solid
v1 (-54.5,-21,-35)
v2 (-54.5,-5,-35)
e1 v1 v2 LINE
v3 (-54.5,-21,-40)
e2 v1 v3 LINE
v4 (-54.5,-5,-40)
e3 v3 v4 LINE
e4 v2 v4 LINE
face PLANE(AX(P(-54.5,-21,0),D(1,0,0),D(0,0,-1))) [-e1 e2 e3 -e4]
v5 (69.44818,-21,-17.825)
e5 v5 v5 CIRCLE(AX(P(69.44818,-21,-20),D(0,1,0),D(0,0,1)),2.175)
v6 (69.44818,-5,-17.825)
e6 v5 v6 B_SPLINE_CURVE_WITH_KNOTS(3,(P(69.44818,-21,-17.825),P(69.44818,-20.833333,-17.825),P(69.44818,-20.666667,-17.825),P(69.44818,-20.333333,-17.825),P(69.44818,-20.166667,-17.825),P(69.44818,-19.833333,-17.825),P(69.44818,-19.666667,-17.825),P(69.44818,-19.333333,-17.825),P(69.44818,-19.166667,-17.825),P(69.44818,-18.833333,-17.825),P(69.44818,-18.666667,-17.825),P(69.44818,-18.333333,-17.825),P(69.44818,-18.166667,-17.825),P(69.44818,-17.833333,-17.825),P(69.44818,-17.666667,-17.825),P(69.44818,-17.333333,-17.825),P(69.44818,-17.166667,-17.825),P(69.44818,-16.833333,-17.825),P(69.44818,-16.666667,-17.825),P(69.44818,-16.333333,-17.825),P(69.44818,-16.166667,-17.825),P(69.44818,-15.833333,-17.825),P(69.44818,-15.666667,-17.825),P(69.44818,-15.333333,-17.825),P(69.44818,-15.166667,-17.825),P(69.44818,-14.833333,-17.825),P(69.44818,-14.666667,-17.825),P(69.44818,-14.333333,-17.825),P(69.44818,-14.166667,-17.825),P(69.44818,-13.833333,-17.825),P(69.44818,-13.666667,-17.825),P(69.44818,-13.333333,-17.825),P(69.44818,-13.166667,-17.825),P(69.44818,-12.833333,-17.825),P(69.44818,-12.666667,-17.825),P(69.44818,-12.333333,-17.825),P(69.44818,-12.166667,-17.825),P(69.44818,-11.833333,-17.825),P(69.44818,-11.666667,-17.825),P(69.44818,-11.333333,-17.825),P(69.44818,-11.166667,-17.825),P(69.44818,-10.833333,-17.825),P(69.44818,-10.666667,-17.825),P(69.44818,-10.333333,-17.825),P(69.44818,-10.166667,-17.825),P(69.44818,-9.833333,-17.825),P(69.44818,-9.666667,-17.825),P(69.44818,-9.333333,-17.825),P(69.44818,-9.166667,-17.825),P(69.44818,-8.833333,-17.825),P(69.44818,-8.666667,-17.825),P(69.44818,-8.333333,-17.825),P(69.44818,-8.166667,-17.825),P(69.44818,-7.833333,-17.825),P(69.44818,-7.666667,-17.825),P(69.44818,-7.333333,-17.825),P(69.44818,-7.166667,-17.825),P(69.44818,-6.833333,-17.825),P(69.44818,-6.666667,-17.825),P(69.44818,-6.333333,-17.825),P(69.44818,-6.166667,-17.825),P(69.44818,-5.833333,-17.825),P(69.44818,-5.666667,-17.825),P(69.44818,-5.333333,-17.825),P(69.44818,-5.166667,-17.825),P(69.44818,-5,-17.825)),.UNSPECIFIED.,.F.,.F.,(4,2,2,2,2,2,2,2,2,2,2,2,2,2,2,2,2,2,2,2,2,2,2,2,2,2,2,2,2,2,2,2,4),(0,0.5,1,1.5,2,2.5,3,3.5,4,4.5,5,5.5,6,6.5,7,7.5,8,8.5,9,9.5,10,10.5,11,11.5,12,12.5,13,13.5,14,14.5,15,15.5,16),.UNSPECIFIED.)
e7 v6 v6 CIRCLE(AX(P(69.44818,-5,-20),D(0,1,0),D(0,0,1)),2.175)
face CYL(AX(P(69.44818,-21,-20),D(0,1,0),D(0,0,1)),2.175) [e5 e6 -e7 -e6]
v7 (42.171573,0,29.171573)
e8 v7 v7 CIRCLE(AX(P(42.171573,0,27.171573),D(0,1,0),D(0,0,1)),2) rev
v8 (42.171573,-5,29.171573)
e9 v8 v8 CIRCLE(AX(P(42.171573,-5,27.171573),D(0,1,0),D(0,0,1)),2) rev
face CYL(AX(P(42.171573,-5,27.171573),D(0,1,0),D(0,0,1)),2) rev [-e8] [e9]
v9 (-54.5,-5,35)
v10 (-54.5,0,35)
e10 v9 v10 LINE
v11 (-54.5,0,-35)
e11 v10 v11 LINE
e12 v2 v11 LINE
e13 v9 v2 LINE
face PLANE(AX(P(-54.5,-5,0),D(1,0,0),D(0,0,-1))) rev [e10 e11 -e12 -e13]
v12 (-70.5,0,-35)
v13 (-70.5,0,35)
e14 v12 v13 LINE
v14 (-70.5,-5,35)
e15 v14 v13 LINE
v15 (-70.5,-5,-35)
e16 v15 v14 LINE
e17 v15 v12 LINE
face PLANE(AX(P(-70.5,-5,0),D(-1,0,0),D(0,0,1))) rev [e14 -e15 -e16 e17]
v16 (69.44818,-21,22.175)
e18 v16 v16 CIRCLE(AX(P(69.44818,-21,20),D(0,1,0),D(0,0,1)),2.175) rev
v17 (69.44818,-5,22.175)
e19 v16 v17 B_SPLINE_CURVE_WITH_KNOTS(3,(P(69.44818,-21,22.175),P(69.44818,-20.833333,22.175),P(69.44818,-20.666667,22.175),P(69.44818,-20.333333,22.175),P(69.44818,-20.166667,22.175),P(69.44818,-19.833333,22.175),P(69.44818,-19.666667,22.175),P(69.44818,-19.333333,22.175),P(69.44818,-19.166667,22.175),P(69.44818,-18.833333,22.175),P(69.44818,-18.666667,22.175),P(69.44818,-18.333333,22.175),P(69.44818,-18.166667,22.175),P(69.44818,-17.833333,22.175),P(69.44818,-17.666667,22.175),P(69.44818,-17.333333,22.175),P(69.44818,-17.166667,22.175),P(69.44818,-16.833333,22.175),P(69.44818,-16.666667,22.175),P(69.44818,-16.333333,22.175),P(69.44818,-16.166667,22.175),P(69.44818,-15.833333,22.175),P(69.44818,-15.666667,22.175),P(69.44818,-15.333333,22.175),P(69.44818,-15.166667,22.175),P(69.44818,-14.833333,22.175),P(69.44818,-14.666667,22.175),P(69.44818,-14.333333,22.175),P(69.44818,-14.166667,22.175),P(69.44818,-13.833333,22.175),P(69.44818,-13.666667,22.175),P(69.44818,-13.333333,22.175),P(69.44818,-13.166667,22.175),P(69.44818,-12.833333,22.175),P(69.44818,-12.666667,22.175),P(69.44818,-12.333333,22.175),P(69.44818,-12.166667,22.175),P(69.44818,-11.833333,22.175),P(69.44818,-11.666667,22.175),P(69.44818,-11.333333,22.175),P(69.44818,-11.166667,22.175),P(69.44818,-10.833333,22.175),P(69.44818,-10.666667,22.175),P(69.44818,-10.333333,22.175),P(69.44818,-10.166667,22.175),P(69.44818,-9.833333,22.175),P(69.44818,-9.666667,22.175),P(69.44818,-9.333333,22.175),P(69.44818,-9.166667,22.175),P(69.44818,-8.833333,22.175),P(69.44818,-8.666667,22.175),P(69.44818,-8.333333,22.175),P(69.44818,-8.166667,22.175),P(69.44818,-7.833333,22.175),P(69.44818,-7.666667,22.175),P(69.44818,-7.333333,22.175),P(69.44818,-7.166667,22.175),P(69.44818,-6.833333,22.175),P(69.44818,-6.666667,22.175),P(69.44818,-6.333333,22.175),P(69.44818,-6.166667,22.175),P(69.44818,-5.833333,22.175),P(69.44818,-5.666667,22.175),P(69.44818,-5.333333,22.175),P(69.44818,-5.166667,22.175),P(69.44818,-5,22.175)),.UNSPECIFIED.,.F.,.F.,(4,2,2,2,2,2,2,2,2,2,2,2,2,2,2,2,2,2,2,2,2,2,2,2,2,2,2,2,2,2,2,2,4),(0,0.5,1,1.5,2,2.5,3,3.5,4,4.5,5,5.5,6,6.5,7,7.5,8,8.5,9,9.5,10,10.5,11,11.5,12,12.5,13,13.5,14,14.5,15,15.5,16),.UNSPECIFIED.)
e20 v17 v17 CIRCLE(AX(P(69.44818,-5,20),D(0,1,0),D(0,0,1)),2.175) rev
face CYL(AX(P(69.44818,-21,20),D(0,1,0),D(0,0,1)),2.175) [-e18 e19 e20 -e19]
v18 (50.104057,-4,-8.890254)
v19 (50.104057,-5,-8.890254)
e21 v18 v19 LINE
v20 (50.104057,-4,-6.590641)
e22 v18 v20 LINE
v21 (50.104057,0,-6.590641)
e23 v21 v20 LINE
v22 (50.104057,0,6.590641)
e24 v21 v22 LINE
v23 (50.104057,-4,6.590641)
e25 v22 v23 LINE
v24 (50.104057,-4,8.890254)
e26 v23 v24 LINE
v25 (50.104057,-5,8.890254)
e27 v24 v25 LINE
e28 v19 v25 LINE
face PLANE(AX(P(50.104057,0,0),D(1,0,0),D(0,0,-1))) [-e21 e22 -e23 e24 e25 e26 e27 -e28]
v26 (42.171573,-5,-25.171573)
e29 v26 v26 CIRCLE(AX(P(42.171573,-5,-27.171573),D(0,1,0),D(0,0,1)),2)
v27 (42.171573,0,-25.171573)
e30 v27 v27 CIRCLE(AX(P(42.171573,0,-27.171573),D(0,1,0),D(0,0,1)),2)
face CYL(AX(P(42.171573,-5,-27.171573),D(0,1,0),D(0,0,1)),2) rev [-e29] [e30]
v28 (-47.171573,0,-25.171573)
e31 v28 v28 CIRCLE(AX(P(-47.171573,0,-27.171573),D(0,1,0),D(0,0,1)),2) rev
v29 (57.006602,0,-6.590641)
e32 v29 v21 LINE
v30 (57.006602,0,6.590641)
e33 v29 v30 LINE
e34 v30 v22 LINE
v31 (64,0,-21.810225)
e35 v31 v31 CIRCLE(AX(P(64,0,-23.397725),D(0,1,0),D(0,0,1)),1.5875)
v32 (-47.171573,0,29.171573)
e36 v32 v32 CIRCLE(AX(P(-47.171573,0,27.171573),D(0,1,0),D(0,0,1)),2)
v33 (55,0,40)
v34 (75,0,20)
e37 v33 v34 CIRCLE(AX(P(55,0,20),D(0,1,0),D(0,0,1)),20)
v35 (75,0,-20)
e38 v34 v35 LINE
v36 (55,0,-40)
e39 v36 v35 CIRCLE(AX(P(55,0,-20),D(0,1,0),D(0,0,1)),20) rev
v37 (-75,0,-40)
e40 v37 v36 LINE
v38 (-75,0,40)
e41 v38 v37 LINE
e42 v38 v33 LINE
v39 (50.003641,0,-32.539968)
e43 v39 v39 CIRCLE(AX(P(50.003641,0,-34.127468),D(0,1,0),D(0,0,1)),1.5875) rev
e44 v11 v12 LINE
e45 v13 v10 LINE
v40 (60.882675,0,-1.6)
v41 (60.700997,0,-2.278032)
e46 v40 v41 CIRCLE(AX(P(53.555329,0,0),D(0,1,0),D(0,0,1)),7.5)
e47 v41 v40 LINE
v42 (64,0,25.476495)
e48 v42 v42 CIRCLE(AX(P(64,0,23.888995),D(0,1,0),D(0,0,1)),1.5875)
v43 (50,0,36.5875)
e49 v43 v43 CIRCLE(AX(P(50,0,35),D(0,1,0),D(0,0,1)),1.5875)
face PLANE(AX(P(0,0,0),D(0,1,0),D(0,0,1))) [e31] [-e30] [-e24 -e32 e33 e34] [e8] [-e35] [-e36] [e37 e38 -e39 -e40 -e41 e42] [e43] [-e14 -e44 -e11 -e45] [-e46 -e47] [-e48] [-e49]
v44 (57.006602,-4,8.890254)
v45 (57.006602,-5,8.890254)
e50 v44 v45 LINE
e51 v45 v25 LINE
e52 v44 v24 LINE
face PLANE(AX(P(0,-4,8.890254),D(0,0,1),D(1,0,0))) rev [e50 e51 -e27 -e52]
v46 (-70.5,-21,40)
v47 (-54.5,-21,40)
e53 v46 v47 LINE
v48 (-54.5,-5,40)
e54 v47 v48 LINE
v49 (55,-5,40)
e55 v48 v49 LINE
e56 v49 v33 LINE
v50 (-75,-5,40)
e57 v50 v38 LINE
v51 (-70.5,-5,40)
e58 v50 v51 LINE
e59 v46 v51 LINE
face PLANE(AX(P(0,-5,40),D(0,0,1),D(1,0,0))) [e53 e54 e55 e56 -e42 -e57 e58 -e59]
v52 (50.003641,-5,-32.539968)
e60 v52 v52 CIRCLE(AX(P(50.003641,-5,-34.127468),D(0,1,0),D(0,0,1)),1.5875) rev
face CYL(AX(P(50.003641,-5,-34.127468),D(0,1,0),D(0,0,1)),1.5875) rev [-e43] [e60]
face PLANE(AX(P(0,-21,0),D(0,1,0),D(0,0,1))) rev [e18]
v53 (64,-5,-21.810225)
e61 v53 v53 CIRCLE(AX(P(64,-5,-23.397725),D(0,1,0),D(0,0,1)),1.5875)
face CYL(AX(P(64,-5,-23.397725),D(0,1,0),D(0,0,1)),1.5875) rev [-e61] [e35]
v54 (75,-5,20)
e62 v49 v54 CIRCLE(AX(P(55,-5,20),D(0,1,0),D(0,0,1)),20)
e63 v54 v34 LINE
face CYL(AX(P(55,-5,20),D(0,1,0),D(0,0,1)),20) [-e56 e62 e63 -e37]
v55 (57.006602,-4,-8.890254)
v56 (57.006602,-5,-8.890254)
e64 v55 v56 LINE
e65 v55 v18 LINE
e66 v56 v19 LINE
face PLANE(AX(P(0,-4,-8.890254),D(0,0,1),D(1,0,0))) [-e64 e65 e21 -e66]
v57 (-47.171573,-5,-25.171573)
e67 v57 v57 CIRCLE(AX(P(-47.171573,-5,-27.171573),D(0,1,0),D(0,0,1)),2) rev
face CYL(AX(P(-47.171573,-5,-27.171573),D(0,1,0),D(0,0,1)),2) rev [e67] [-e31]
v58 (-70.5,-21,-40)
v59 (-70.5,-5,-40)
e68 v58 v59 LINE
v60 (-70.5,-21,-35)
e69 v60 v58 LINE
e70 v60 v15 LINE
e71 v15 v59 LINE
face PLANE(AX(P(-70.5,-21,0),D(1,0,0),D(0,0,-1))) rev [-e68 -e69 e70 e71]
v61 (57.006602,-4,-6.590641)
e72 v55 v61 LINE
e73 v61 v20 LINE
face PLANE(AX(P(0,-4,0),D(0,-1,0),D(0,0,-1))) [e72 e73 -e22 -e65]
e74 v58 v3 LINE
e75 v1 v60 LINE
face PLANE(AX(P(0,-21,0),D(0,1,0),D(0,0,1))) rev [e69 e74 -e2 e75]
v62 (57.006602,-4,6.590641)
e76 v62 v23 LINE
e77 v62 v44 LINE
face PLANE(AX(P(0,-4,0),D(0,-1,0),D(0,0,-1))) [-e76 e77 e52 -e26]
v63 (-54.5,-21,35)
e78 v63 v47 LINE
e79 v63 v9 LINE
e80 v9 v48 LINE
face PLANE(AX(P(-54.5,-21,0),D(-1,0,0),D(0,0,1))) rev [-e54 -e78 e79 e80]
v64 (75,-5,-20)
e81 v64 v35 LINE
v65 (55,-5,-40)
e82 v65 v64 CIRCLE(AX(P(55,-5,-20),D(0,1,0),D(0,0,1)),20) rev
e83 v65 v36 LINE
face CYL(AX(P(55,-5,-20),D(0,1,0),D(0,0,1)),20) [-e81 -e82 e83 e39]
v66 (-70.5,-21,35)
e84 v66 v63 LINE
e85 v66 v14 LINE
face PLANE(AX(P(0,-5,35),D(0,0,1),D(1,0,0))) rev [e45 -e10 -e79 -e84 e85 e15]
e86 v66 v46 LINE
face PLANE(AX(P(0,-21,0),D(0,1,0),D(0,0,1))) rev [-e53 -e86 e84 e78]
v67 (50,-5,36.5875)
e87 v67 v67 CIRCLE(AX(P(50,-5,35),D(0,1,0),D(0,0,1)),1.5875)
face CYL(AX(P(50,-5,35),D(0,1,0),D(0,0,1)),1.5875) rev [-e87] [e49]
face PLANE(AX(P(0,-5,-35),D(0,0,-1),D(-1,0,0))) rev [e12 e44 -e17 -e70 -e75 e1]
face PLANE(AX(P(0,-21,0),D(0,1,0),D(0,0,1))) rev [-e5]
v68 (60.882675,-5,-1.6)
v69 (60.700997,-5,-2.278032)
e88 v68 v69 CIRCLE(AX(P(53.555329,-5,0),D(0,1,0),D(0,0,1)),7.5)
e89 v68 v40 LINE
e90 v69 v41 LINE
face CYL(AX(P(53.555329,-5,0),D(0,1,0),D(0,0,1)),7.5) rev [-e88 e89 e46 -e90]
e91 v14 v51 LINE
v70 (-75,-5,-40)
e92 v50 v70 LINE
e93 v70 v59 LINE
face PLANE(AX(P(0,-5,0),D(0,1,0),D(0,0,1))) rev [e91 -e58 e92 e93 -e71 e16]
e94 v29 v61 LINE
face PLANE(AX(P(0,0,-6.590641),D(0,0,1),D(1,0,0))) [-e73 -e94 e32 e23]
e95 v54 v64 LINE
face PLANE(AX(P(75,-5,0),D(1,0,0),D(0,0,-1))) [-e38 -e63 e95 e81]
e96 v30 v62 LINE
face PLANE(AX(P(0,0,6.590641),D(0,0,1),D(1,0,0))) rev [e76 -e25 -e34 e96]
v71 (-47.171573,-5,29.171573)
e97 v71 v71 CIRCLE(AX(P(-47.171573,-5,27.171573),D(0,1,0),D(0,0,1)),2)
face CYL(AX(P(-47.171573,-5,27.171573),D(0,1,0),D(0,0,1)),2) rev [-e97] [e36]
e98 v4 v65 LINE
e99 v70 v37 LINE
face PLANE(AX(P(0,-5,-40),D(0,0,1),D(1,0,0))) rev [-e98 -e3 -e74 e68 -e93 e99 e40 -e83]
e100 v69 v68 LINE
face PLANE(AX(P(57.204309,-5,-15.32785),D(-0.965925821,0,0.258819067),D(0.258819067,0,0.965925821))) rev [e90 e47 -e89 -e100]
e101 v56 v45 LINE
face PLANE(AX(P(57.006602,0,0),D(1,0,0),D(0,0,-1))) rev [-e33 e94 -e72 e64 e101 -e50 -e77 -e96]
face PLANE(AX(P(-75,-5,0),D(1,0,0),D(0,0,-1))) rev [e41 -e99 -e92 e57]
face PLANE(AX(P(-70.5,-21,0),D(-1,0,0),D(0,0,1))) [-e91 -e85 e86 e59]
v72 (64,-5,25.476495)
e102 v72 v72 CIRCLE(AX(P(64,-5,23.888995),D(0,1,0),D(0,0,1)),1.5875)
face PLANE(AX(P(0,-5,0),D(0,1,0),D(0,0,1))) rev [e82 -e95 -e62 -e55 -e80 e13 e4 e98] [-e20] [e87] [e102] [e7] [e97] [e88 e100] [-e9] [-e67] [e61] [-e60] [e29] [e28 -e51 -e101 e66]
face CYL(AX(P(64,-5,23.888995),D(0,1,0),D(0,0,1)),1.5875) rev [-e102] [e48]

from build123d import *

# Parameters (mm, degrees)
CROQUIS2_R              = 2
CROQUIS2_R_2            = 1.5875
CROQUIS2_R_3            = 2.175
CROQUIS2_W              = 16
CROQUIS2_H              = 70
SALIENTE_EXTRUIR1_DEPTH = 5
CROQUIS2_3_W            = 16
CROQUIS2_3_H            = 5
CROQUIS2_3_R            = 2.175
SALIENTE_EXTRUIR2_DEPTH = 21
CROQUIS4_W              = 6.902544823
CROQUIS4_H              = 13.181281006
CORTAR_EXTRUIR1_DEPTH   = 5
CROQUIS4_3_W            = 6.902544823
CROQUIS4_3_H            = 2.299613284
CORTAR_EXTRUIR2_DEPTH   = 1


with BuildPart() as part:
    # Croquis2 → Saliente-Extruir1 (new body)
    with BuildSketch(Plane(origin=(0, 0, 0), x_dir=(1, 0, 0), z_dir=(0, 1, 0))):
        with BuildLine():
            Line((-75, 40), (-75, -40))
            Line((-75, -40), (55, -40))
            ThreePointArc((55, -40), (69.142135624, -34.142135624), (75, -20))
            Line((75, -20), (75, 20))
            ThreePointArc((75, 20), (69.142135624, 34.142135624), (55, 40))
            Line((55, 40), (-75, 40))
        make_face()
        with Locations(Location((-47.171572875, -27.171572875, 0), (0, 0, 270))):
            Circle(CROQUIS2_R, mode=Mode.SUBTRACT)
        with Locations(Location((50, -35, 0), (0, 0, 270))):
            Circle(CROQUIS2_R_2, mode=Mode.SUBTRACT)
        with Locations(Location((42.171572875, -27.171572875, 0), (0, 0, 270))):
            Circle(CROQUIS2_R, mode=Mode.SUBTRACT)
        with Locations(Location((64, -23.888995042, 0), (0, 0, 270))):
            Circle(CROQUIS2_R_2, mode=Mode.SUBTRACT)
        with Locations(Location((69.44817995, -20, 0), (0, 0, 270))):
            Circle(CROQUIS2_R_3, mode=Mode.SUBTRACT)
        with Locations((-62.5, 0)):
            Rectangle(CROQUIS2_W, CROQUIS2_H, mode=Mode.SUBTRACT)
        with Locations(Location((-47.171572875, 27.171572875, 0), (0, 0, 270))):
            Circle(CROQUIS2_R, mode=Mode.SUBTRACT)
        with BuildLine():
            Line((54.218575207, 2.358517529), (54.281519289, 2.234982813))
            Line((54.281519289, 2.234982813), (54.405054005, 2.297926895))
            ThreePointArc((54.405054005, 2.297926895), (54.433330829, 2.287272045), (54.46147409, 2.276269253))
            Line((54.46147409, 2.276269253), (54.511160464, 2.146831825))
            Line((54.511160464, 2.146831825), (54.640597892, 2.196518199))
            ThreePointArc((54.640597892, 2.196518199), (54.667606077, 2.182965984), (54.694445062, 2.169081695))
            Line((54.694445062, 2.169081695), (54.730329352, 2.035159699))
            Line((54.730329352, 2.035159699), (54.864251349, 2.07104399))
            ThreePointArc((54.864251349, 2.07104399), (54.889694988, 2.054742891), (54.914935643, 2.038129224))
            Line((54.914935643, 2.038129224), (54.936624695, 1.901189937))
            Line((54.936624695, 1.901189937), (55.073563983, 1.922878989))
            ThreePointArc((55.073563983, 1.922878989), (55.09716431, 1.904007606), (55.120530093, 1.884846583))
            Line((55.120530093, 1.884846583), (55.127786277, 1.74639034))
            Line((55.127786277, 1.74639034), (55.26624252, 1.753646524))
            ThreePointArc((55.26624252, 1.753646524), (55.287740966, 1.732411614), (55.308975876, 1.710913168))
            Line((55.308975876, 1.710913168), (55.301719692, 1.572456925))
            Line((55.301719692, 1.572456925), (55.440175935, 1.565200741))
            ThreePointArc((55.440175935, 1.565200741), (55.459336958, 1.541834958), (55.478208342, 1.51823463))
            Line((55.478208342, 1.51823463), (55.456519289, 1.381295343))
            Line((55.456519289, 1.381295343), (55.593458577, 1.35960629))
            ThreePointArc((55.593458577, 1.35960629), (55.610072244, 1.334365636), (55.626373342, 1.308921996))
            Line((55.626373342, 1.308921996), (55.590489051, 1.175))
            Line((55.590489051, 1.175), (55.724411048, 1.139115709))
            ThreePointArc((55.724411048, 1.139115709), (55.738295337, 1.112276724), (55.751847551, 1.085268539))
            Line((55.751847551, 1.085268539), (55.702161178, 0.955831111))
            Line((55.702161178, 0.955831111), (55.831598606, 0.906144738))
            ThreePointArc((55.831598606, 0.906144738), (55.842601397, 0.878001476), (55.853256247, 0.849724653))
            Line((55.853256247, 0.849724653), (55.790312166, 0.726189937))
            Line((55.790312166, 0.726189937), (55.913846882, 0.663245855))
            ThreePointArc((55.913846882, 0.663245855), (55.921847627, 0.634106661), (55.929488376, 0.604871005))
            Line((55.929488376, 0.604871005), (55.853976214, 0.488592473))
            Line((55.853976214, 0.488592473), (55.970254746, 0.413080312))
            ThreePointArc((55.970254746, 0.413080312), (55.975165787, 0.383264439), (55.979708721, 0.353390264))
            Line((55.979708721, 0.353390264), (55.892455806, 0.245641889))
            Line((55.892455806, 0.245641889), (56.000204182, 0.158388975))
            ThreePointArc((56.000204182, 0.158388975), (56.001971713, 0.128223093), (56.003367058, 0.098037706))
            Line((56.003367058, 0.098037706), (55.905329352, 0))
            Line((55.905329352, 0), (56.003367058, -0.098037706))
            ThreePointArc((56.003367058, -0.098037706), (56.001971713, -0.128223093), (56.000204182, -0.158388975))
            Line((56.000204182, -0.158388975), (55.892455806, -0.245641889))
            Line((55.892455806, -0.245641889), (55.979708721, -0.353390264))
            ThreePointArc((55.979708721, -0.353390264), (55.975165787, -0.383264439), (55.970254746, -0.413080312))
            Line((55.970254746, -0.413080312), (55.853976214, -0.488592473))
            Line((55.853976214, -0.488592473), (55.929488376, -0.604871005))
            ThreePointArc((55.929488376, -0.604871005), (55.921847627, -0.634106661), (55.913846882, -0.663245855))
            Line((55.913846882, -0.663245855), (55.790312166, -0.726189937))
            Line((55.790312166, -0.726189937), (55.853256247, -0.849724653))
            ThreePointArc((55.853256247, -0.849724653), (55.842601397, -0.878001476), (55.831598606, -0.906144738))
            Line((55.831598606, -0.906144738), (55.702161178, -0.955831111))
            Line((55.702161178, -0.955831111), (55.751847551, -1.085268539))
            ThreePointArc((55.751847551, -1.085268539), (55.738295337, -1.112276724), (55.724411048, -1.139115709))
            Line((55.724411048, -1.139115709), (55.590489051, -1.175))
            Line((55.590489051, -1.175), (55.626373342, -1.308921996))
            ThreePointArc((55.626373342, -1.308921996), (55.610072244, -1.334365636), (55.593458577, -1.35960629))
            Line((55.593458577, -1.35960629), (55.456519289, -1.381295343))
            Line((55.456519289, -1.381295343), (55.478208342, -1.51823463))
            ThreePointArc((55.478208342, -1.51823463), (55.459336958, -1.541834958), (55.440175935, -1.565200741))
            Line((55.440175935, -1.565200741), (55.301719692, -1.572456925))
            Line((55.301719692, -1.572456925), (55.308975876, -1.710913168))
            ThreePointArc((55.308975876, -1.710913168), (55.287740966, -1.732411614), (55.26624252, -1.753646524))
            Line((55.26624252, -1.753646524), (55.127786277, -1.74639034))
            Line((55.127786277, -1.74639034), (55.120530093, -1.884846583))
            ThreePointArc((55.120530093, -1.884846583), (55.09716431, -1.904007606), (55.073563983, -1.922878989))
            Line((55.073563983, -1.922878989), (54.936624695, -1.901189937))
            Line((54.936624695, -1.901189937), (54.914935643, -2.038129224))
            ThreePointArc((54.914935643, -2.038129224), (54.889694988, -2.054742891), (54.864251349, -2.07104399))
            Line((54.864251349, -2.07104399), (54.730329352, -2.035159699))
            Line((54.730329352, -2.035159699), (54.694445062, -2.169081695))
            ThreePointArc((54.694445062, -2.169081695), (54.667606077, -2.182965984), (54.640597892, -2.196518199))
            Line((54.640597892, -2.196518199), (54.511160464, -2.146831825))
            Line((54.511160464, -2.146831825), (54.46147409, -2.276269253))
            ThreePointArc((54.46147409, -2.276269253), (54.433330829, -2.287272045), (54.405054005, -2.297926895))
            Line((54.405054005, -2.297926895), (54.281519289, -2.234982813))
            Line((54.281519289, -2.234982813), (54.218575207, -2.358517529))
            ThreePointArc((54.218575207, -2.358517529), (54.189436013, -2.366518274), (54.160200358, -2.374159023))
            Line((54.160200358, -2.374159023), (54.043921826, -2.298646862))
            Line((54.043921826, -2.298646862), (53.968409664, -2.414925393))
            ThreePointArc((53.968409664, -2.414925393), (53.938593792, -2.419836434), (53.908719617, -2.424379368))
            Line((53.908719617, -2.424379368), (53.800971241, -2.337126454))
            Line((53.800971241, -2.337126454), (53.713718327, -2.44487483))
            ThreePointArc((53.713718327, -2.44487483), (53.683552445, -2.44664236), (53.653367058, -2.448037706))
            Line((53.653367058, -2.448037706), (53.555329352, -2.35))
            Line((53.555329352, -2.35), (53.457291647, -2.448037706))
            ThreePointArc((53.457291647, -2.448037706), (53.42710626, -2.44664236), (53.396940378, -2.44487483))
            Line((53.396940378, -2.44487483), (53.309687464, -2.337126454))
            Line((53.309687464, -2.337126454), (53.201939088, -2.424379368))
            ThreePointArc((53.201939088, -2.424379368), (53.172064913, -2.419836434), (53.14224904, -2.414925393))
            Line((53.14224904, -2.414925393), (53.066736879, -2.298646862))
            Line((53.066736879, -2.298646862), (52.950458347, -2.374159023))
            ThreePointArc((52.950458347, -2.374159023), (52.921222692, -2.366518274), (52.892083497, -2.358517529))
            Line((52.892083497, -2.358517529), (52.829139416, -2.234982813))
            Line((52.829139416, -2.234982813), (52.7056047, -2.297926895))
            ThreePointArc((52.7056047, -2.297926895), (52.677327876, -2.287272045), (52.649184615, -2.276269253))
            Line((52.649184615, -2.276269253), (52.599498241, -2.146831825))
            Line((52.599498241, -2.146831825), (52.470060813, -2.196518199))
            ThreePointArc((52.470060813, -2.196518199), (52.443052628, -2.182965984), (52.416213643, -2.169081695))
            Line((52.416213643, -2.169081695), (52.380329352, -2.035159699))
            Line((52.380329352, -2.035159699), (52.246407356, -2.07104399))
            ThreePointArc((52.246407356, -2.07104399), (52.220963717, -2.054742891), (52.195723062, -2.038129224))
            Line((52.195723062, -2.038129224), (52.174034009, -1.901189937))
            Line((52.174034009, -1.901189937), (52.037094722, -1.922878989))
            ThreePointArc((52.037094722, -1.922878989), (52.013494394, -1.904007606), (51.990128612, -1.884846583))
            Line((51.990128612, -1.884846583), (51.982872427, -1.74639034))
            Line((51.982872427, -1.74639034), (51.844416184, -1.753646524))
            ThreePointArc((51.844416184, -1.753646524), (51.822917738, -1.732411614), (51.801682828, -1.710913168))
            Line((51.801682828, -1.710913168), (51.808939013, -1.572456925))
            Line((51.808939013, -1.572456925), (51.670482769, -1.565200741))
            ThreePointArc((51.670482769, -1.565200741), (51.651321747, -1.541834958), (51.632450363, -1.51823463))
            Line((51.632450363, -1.51823463), (51.654139416, -1.381295343))
            Line((51.654139416, -1.381295343), (51.517200128, -1.35960629))
            ThreePointArc((51.517200128, -1.35960629), (51.500586461, -1.334365636), (51.484285363, -1.308921996))
            Line((51.484285363, -1.308921996), (51.520169653, -1.175))
            Line((51.520169653, -1.175), (51.386247657, -1.139115709))
            ThreePointArc((51.386247657, -1.139115709), (51.372363368, -1.112276724), (51.358811154, -1.085268539))
            Line((51.358811154, -1.085268539), (51.408497527, -0.955831111))
            Line((51.408497527, -0.955831111), (51.279060099, -0.906144738))
            ThreePointArc((51.279060099, -0.906144738), (51.268057307, -0.878001476), (51.257402457, -0.849724653))
            Line((51.257402457, -0.849724653), (51.320346539, -0.726189937))
            Line((51.320346539, -0.726189937), (51.196811823, -0.663245855))
            ThreePointArc((51.196811823, -0.663245855), (51.188811078, -0.634106661), (51.181170329, -0.604871005))
            Line((51.181170329, -0.604871005), (51.256682491, -0.488592473))
            Line((51.256682491, -0.488592473), (51.140403959, -0.413080312))
            ThreePointArc((51.140403959, -0.413080312), (51.135492918, -0.383264439), (51.130949984, -0.353390264))
            Line((51.130949984, -0.353390264), (51.218202898, -0.245641889))
            Line((51.218202898, -0.245641889), (51.110454523, -0.158388975))
            ThreePointArc((51.110454523, -0.158388975), (51.108686992, -0.128223093), (51.107291647, -0.098037706))
            Line((51.107291647, -0.098037706), (51.205329352, 0))
            Line((51.205329352, 0), (51.107291647, 0.098037706))
            ThreePointArc((51.107291647, 0.098037706), (51.108686992, 0.128223093), (51.110454523, 0.158388975))
            Line((51.110454523, 0.158388975), (51.218202898, 0.245641889))
            Line((51.218202898, 0.245641889), (51.130949984, 0.353390264))
            ThreePointArc((51.130949984, 0.353390264), (51.135492918, 0.383264439), (51.140403959, 0.413080312))
            Line((51.140403959, 0.413080312), (51.256682491, 0.488592473))
            Line((51.256682491, 0.488592473), (51.181170329, 0.604871005))
            ThreePointArc((51.181170329, 0.604871005), (51.188811078, 0.634106661), (51.196811823, 0.663245855))
            Line((51.196811823, 0.663245855), (51.320346539, 0.726189937))
            Line((51.320346539, 0.726189937), (51.257402457, 0.849724653))
            ThreePointArc((51.257402457, 0.849724653), (51.268057307, 0.878001476), (51.279060099, 0.906144738))
            Line((51.279060099, 0.906144738), (51.408497527, 0.955831111))
            Line((51.408497527, 0.955831111), (51.358811154, 1.085268539))
            ThreePointArc((51.358811154, 1.085268539), (51.372363368, 1.112276724), (51.386247657, 1.139115709))
            Line((51.386247657, 1.139115709), (51.520169653, 1.175))
            Line((51.520169653, 1.175), (51.484285363, 1.308921996))
            ThreePointArc((51.484285363, 1.308921996), (51.500586461, 1.334365636), (51.517200128, 1.35960629))
            Line((51.517200128, 1.35960629), (51.654139416, 1.381295343))
            Line((51.654139416, 1.381295343), (51.632450363, 1.51823463))
            ThreePointArc((51.632450363, 1.51823463), (51.651321747, 1.541834958), (51.670482769, 1.565200741))
            Line((51.670482769, 1.565200741), (51.808939013, 1.572456925))
            Line((51.808939013, 1.572456925), (51.801682828, 1.710913168))
            ThreePointArc((51.801682828, 1.710913168), (51.822917738, 1.732411614), (51.844416184, 1.753646524))
            Line((51.844416184, 1.753646524), (51.982872427, 1.74639034))
            Line((51.982872427, 1.74639034), (51.990128612, 1.884846583))
            ThreePointArc((51.990128612, 1.884846583), (52.013494394, 1.904007606), (52.037094722, 1.922878989))
            Line((52.037094722, 1.922878989), (52.174034009, 1.901189937))
            Line((52.174034009, 1.901189937), (52.195723062, 2.038129224))
            ThreePointArc((52.195723062, 2.038129224), (52.220963717, 2.054742891), (52.246407356, 2.07104399))
            Line((52.246407356, 2.07104399), (52.380329352, 2.035159699))
            Line((52.380329352, 2.035159699), (52.416213643, 2.169081695))
            ThreePointArc((52.416213643, 2.169081695), (52.443052628, 2.182965984), (52.470060813, 2.196518199))
            Line((52.470060813, 2.196518199), (52.599498241, 2.146831825))
            Line((52.599498241, 2.146831825), (52.649184615, 2.276269253))
            ThreePointArc((52.649184615, 2.276269253), (52.677327876, 2.287272045), (52.7056047, 2.297926895))
            Line((52.7056047, 2.297926895), (52.829139416, 2.234982813))
            Line((52.829139416, 2.234982813), (52.892083497, 2.358517529))
            ThreePointArc((52.892083497, 2.358517529), (52.921222692, 2.366518274), (52.950458347, 2.374159023))
            Line((52.950458347, 2.374159023), (53.066736879, 2.298646862))
            Line((53.066736879, 2.298646862), (53.14224904, 2.414925393))
            ThreePointArc((53.14224904, 2.414925393), (53.172064913, 2.419836434), (53.201939088, 2.424379368))
            Line((53.201939088, 2.424379368), (53.309687464, 2.337126454))
            Line((53.309687464, 2.337126454), (53.396940378, 2.44487483))
            ThreePointArc((53.396940378, 2.44487483), (53.42710626, 2.44664236), (53.457291647, 2.448037706))
            Line((53.457291647, 2.448037706), (53.555329352, 2.35))
            Line((53.555329352, 2.35), (53.653367058, 2.448037706))
            ThreePointArc((53.653367058, 2.448037706), (53.683552445, 2.44664236), (53.713718327, 2.44487483))
            Line((53.713718327, 2.44487483), (53.800971241, 2.337126454))
            Line((53.800971241, 2.337126454), (53.908719617, 2.424379368))
            ThreePointArc((53.908719617, 2.424379368), (53.938593792, 2.419836434), (53.968409664, 2.414925393))
            Line((53.968409664, 2.414925393), (54.043921826, 2.298646862))
            Line((54.043921826, 2.298646862), (54.160200358, 2.374159023))
            ThreePointArc((54.160200358, 2.374159023), (54.189436013, 2.366518274), (54.218575207, 2.358517529))
        make_face(mode=Mode.SUBTRACT)
        with BuildLine():
            ThreePointArc((60.700997154, 2.278032411), (60.79977304, 1.941142874), (60.882675385, 1.600000035))
            Line((60.882675363, 1.60000003), (60.700997121, 2.2780324))
        make_face(mode=Mode.SUBTRACT)
        with Locations(Location((69.4481799, 20, 0), (0, 0, 270))):
            Circle(CROQUIS2_R_3, mode=Mode.SUBTRACT)
        with Locations(Location((64, 23.397724669, 0), (0, 0, 270))):
            Circle(CROQUIS2_R_2, mode=Mode.SUBTRACT)
        with Locations(Location((42.171572875, 27.171572875, 0), (0, 0, 270))):
            Circle(CROQUIS2_R, mode=Mode.SUBTRACT)
        with Locations(Location((50.003640725, 34.127468235, 0), (0, 0, 270))):
            Circle(CROQUIS2_R_2, mode=Mode.SUBTRACT)
    extrude(amount=-SALIENTE_EXTRUIR1_DEPTH)

    # Croquis2<3> → Saliente-Extruir2 (add)
    with BuildSketch(Plane(origin=(0, 0, 0), x_dir=(1, 0, 0), z_dir=(0, 1, 0))):
        with Locations((-62.5, 37.5)):
            Rectangle(CROQUIS2_3_W, CROQUIS2_3_H)
        with Locations((-62.5, -37.5)):
            Rectangle(CROQUIS2_3_W, CROQUIS2_3_H)
        with Locations(Location((69.4481799, 20, 0), (0, 0, 270))):
            Circle(CROQUIS2_3_R)
        with Locations(Location((69.44817995, -20, 0), (0, 0, 270))):
            Circle(CROQUIS2_3_R)
    extrude(amount=-SALIENTE_EXTRUIR2_DEPTH)

    # Croquis4 → Cortar-Extruir1 (cut)
    with BuildSketch(Plane.XZ.offset(5)):
        with Locations((53.555329353, 0)):
            Rectangle(CROQUIS4_W, CROQUIS4_H)
    extrude(amount=-CORTAR_EXTRUIR1_DEPTH, mode=Mode.SUBTRACT)

    # Croquis4<3> → Cortar-Extruir2 (cut)
    with BuildSketch(Plane.XZ.offset(5)):
        with Locations((53.555329353, 7.740447145)):
            Rectangle(CROQUIS4_3_W, CROQUIS4_3_H)
        with Locations((53.555329353, -7.740447145)):
            Rectangle(CROQUIS4_3_W, CROQUIS4_3_H)
    extrude(amount=-CORTAR_EXTRUIR2_DEPTH, mode=Mode.SUBTRACT)


solid = part.part
